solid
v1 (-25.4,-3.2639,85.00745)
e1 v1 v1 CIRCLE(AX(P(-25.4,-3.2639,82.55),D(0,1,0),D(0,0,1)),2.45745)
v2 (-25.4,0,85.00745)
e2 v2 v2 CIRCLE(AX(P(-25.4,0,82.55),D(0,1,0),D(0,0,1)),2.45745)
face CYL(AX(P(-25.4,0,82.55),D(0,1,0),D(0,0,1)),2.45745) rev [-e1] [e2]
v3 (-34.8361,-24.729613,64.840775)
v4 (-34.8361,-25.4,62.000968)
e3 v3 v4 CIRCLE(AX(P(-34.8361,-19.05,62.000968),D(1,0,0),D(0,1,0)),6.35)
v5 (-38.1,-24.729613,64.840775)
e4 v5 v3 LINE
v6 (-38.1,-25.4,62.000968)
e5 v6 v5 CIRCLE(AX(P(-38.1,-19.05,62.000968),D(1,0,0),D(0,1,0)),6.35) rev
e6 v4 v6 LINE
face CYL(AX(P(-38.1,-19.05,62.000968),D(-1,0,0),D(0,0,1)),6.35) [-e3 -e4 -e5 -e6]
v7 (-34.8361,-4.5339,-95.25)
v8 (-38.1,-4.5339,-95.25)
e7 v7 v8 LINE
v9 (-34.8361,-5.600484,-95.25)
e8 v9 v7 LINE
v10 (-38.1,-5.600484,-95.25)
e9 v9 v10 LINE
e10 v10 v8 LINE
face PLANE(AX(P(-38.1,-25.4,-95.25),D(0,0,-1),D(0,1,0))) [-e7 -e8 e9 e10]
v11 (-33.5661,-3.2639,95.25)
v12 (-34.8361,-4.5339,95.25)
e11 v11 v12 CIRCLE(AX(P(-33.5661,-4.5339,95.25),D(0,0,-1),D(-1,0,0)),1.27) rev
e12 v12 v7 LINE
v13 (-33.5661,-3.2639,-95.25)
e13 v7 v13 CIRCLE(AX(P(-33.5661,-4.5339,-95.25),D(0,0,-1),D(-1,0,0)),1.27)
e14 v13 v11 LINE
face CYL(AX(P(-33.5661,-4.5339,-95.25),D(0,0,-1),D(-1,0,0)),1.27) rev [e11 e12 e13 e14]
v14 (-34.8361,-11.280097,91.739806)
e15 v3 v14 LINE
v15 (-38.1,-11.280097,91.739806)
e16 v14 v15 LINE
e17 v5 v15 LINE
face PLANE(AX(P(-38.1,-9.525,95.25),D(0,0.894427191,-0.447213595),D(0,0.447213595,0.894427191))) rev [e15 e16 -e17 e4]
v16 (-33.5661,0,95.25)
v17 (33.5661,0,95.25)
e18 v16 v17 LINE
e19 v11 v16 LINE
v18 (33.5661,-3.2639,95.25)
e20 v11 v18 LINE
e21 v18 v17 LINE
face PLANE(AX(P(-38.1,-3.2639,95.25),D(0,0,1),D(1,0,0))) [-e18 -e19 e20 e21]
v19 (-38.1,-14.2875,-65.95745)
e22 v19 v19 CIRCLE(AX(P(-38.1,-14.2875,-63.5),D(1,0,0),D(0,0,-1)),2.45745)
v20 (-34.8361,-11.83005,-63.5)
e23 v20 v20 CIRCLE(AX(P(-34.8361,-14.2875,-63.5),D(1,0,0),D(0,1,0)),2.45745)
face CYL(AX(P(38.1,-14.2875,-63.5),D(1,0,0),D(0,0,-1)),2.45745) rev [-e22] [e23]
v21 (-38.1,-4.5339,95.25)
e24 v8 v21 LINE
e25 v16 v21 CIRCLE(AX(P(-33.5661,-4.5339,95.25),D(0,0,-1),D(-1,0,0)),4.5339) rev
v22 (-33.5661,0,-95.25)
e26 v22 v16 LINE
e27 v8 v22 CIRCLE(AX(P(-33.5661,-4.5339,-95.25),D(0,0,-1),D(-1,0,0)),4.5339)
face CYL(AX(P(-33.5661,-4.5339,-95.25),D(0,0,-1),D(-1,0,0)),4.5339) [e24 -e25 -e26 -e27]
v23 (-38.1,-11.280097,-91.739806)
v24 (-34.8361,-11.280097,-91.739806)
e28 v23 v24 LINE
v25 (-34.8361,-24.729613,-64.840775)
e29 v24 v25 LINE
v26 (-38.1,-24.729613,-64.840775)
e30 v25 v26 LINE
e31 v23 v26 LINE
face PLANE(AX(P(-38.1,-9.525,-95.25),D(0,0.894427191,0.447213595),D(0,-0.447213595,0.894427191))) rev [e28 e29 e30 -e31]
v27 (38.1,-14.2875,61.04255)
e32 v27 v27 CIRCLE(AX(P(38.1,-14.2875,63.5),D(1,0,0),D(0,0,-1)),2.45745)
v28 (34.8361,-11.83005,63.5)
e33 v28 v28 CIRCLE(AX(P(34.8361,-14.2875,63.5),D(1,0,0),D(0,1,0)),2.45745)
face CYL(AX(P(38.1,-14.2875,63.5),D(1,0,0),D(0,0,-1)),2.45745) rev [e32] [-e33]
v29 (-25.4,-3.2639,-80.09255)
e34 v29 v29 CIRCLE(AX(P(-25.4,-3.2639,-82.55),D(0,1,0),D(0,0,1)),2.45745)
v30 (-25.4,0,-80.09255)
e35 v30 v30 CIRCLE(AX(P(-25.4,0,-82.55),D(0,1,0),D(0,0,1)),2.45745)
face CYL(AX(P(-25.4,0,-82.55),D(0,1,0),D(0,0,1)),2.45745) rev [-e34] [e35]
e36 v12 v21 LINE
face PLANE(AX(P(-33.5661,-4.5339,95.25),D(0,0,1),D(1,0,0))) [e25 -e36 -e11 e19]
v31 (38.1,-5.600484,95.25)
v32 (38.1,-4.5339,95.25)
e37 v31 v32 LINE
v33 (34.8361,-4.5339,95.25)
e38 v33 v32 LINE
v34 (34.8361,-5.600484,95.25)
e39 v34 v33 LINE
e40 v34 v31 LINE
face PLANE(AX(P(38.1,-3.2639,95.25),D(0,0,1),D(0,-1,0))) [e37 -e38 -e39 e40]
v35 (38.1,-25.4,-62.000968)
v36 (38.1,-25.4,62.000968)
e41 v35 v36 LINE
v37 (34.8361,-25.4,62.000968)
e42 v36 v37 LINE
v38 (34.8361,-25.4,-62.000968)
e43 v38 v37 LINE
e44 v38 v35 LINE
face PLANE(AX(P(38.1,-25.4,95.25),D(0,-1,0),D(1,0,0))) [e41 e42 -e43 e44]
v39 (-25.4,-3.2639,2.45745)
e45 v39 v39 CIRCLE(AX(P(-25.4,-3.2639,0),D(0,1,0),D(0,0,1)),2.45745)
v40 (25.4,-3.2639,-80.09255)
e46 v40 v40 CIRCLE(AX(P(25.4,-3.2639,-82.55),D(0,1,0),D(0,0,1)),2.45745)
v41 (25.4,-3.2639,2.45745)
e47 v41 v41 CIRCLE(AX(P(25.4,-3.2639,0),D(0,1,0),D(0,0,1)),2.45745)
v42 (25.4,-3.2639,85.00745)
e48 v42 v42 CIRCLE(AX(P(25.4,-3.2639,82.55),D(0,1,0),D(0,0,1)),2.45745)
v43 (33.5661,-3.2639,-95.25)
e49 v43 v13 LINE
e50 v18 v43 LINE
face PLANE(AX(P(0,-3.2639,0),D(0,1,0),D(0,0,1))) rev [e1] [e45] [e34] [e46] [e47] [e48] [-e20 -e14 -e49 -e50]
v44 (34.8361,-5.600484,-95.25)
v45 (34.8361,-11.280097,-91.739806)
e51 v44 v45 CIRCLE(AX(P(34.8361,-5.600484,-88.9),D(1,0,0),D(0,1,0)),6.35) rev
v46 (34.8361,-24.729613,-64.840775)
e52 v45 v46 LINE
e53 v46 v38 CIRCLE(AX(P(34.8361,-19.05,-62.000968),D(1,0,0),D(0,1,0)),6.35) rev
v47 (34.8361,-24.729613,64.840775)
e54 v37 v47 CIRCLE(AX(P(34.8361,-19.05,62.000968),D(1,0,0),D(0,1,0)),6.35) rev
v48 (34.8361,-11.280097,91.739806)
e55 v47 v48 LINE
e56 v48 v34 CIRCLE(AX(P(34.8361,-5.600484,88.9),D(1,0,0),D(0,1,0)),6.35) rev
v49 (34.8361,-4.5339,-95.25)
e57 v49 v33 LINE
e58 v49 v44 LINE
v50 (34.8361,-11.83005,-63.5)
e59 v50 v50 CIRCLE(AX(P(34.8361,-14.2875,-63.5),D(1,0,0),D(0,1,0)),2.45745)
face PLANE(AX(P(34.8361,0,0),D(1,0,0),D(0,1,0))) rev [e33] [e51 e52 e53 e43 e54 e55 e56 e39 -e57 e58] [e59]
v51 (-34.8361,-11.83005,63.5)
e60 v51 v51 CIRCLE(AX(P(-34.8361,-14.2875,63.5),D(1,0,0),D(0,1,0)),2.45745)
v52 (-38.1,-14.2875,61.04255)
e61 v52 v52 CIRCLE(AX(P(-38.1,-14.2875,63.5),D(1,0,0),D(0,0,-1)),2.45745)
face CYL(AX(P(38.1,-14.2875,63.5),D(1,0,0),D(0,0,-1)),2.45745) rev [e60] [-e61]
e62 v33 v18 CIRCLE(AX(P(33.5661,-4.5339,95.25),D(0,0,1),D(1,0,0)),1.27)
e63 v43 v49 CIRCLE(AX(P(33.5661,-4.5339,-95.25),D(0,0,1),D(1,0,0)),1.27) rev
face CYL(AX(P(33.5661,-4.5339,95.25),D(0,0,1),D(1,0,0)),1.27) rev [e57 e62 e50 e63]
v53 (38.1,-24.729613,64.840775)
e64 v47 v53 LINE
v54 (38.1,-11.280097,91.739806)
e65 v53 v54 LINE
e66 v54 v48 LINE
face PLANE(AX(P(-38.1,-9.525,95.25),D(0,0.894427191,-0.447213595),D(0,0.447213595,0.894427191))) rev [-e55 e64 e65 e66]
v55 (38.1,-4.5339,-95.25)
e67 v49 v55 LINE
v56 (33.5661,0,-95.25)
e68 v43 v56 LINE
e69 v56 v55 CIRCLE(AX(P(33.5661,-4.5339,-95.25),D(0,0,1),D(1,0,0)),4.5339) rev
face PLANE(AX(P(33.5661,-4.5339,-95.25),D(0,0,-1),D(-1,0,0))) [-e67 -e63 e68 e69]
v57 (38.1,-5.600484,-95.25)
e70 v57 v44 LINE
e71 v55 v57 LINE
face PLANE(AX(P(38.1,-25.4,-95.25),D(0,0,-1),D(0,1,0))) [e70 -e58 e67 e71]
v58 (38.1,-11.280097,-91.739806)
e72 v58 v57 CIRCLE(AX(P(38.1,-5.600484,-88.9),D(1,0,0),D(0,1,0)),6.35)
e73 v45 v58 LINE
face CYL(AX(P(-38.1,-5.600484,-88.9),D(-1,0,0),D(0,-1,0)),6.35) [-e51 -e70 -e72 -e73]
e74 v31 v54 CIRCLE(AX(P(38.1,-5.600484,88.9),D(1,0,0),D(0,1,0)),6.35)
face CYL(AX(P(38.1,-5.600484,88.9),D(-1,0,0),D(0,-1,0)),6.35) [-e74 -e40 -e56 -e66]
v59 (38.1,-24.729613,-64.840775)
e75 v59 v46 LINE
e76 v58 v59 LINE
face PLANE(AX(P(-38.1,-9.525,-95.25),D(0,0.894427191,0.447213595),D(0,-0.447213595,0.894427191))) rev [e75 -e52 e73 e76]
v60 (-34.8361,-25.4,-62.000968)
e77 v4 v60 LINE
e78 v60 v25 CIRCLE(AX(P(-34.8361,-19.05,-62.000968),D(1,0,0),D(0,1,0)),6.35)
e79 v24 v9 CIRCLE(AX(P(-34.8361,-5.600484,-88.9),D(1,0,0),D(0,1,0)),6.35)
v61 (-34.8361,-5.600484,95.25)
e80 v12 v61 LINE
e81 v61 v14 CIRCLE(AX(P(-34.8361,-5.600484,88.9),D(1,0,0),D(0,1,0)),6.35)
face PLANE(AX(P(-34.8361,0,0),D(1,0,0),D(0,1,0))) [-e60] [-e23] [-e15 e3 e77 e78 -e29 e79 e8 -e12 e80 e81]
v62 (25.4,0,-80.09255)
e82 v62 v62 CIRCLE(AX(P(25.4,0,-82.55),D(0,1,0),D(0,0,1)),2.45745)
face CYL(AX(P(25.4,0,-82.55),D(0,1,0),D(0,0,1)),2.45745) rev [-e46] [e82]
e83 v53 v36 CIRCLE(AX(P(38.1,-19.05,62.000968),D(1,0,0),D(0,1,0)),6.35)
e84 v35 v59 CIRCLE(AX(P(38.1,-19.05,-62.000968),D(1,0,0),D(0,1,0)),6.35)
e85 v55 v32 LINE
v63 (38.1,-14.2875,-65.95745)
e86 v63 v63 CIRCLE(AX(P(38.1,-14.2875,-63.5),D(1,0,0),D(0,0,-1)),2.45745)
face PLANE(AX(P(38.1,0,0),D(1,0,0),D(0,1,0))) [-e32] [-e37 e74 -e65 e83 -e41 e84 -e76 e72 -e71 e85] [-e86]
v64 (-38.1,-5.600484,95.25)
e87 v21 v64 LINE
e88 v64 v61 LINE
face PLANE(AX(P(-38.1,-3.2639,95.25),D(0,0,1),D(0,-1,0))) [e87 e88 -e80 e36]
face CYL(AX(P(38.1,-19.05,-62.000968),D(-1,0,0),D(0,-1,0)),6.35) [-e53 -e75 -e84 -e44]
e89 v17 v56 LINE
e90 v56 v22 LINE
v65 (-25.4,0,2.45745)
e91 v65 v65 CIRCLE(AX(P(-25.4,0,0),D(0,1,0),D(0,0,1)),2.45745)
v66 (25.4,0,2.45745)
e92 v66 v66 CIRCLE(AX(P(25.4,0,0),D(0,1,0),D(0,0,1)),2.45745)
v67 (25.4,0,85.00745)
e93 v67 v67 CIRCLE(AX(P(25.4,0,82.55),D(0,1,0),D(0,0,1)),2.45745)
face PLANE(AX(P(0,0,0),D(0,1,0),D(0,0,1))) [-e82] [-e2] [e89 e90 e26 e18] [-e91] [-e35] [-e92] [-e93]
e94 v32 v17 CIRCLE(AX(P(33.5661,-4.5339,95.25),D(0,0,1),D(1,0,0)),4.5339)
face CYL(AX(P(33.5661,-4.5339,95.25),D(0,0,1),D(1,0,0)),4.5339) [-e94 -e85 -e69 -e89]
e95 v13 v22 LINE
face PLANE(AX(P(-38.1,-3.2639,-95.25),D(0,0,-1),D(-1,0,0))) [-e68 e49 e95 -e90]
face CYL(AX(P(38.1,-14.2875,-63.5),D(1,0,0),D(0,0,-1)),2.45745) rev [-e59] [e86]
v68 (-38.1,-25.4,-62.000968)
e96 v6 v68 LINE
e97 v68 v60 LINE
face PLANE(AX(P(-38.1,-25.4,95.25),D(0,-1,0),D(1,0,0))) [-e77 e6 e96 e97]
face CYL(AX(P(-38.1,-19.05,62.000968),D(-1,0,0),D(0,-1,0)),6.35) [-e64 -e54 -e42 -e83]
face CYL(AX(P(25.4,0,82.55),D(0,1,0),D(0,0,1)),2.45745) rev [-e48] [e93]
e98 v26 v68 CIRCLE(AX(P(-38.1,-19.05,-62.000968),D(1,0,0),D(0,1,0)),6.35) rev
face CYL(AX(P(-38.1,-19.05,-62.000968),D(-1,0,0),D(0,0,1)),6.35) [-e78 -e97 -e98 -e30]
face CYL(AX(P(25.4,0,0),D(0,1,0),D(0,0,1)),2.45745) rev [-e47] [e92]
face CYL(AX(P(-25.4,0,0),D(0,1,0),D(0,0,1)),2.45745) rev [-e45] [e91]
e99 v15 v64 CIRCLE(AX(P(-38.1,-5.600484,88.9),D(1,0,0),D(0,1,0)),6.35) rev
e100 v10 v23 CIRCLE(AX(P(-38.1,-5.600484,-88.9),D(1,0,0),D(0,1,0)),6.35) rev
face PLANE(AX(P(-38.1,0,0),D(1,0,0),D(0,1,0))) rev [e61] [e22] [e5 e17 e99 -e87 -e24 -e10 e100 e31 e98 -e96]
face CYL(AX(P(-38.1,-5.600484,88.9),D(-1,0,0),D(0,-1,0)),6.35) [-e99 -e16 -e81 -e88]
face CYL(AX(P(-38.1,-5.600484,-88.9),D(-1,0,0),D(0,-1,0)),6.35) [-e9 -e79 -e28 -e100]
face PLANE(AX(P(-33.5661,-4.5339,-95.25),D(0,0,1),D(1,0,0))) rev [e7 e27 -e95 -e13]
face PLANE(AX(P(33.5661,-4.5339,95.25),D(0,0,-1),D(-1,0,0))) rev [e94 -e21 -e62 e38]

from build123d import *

# Parameters (mm, degrees)
SKETCH1_W                      = 76.2
SKETCH1_H                      = 190.5
BASE_FLANGE1_DEPTH             = 3.2639
EDGE_FLANGE1_STRIP_W           = 15.5956
EDGE_FLANGE1_STRIP_H           = 3.2639
EDGE_FLANGE1_STRIP_CUT_DEPTH   = 190.5
EDGE_FLANGE1_STRIP_2_W         = 15.5956
EDGE_FLANGE1_STRIP_2_H         = 3.2639
EDGE_FLANGE1_STRIP_CUT_2_DEPTH = 190.5
EDGE_FLANGE1_DEPTH             = 190.5
EDGE_FLANGE1_BEND_DEPTH        = 190.5
F_10_0_1935_DIAMETER_HOLE1_D   = 4.9149
F_10_0_1935_DIAMETER_HOLE2_D   = 4.9149
CUT_EXTRUDE1_DEPTH             = 125.595997127
FILLET2_R                      = 6.35


# Sheet-metal steps are written as plain solids
with BuildPart() as part:
    # Sketch1 → Base-Flange1 (new body)
    with BuildSketch(Plane(origin=(0, 0, 0), x_dir=(1, 0, 0), z_dir=(0, 1, 0))):
        Rectangle(SKETCH1_W, SKETCH1_H)
    extrude(amount=-BASE_FLANGE1_DEPTH)

    # Edge-Flange1 strip (across the edge) → Edge-Flange1 strip cut (cut)
    with BuildSketch(Plane(origin=(38.1, -3.2639, -95.25), x_dir=(-1, 0, 0), z_dir=(0, 0, 1))):
        with Locations((-3.2639, -1.63195)):
            Rectangle(EDGE_FLANGE1_STRIP_W, EDGE_FLANGE1_STRIP_H)
    extrude(amount=EDGE_FLANGE1_STRIP_CUT_DEPTH, mode=Mode.SUBTRACT)

    # Edge-Flange1 strip 2 (across the edge) → Edge-Flange1 strip cut 2 (cut)
    with BuildSketch(Plane(origin=(-38.1, -3.2639, 95.25), x_dir=(1, 0, 0), z_dir=(0, 0, -1))):
        with Locations((-3.2639, -1.63195)):
            Rectangle(EDGE_FLANGE1_STRIP_2_W, EDGE_FLANGE1_STRIP_2_H)
    extrude(amount=EDGE_FLANGE1_STRIP_CUT_2_DEPTH, mode=Mode.SUBTRACT)

    # Edge-Flange1 section (across the edge) → Edge-Flange1 (add)
    with BuildSketch(Plane(origin=(38.1, -3.2639, -95.25), x_dir=(-1, 0, 0), z_dir=(0, 0, 1))):
        with BuildLine():
            Line((0, 1.27), (0, 22.1361))
            Line((0, 22.1361), (3.2639, 22.1361))
            Line((3.2639, 22.1361), (3.2639, 1.27))
            ThreePointArc((3.2639, 1.27), (3.635874388, 0.371974388), (4.5339, 0))
            Line((4.5339, 0), (4.5339, -3.2639))
            ThreePointArc((4.5339, -3.2639), (1.327948565, -1.935951435), (0, 1.27))
        make_face()
    extrude(amount=EDGE_FLANGE1_DEPTH)

    # Edge-Flange1 section 2 (across the edge) → Edge-Flange1 bend (add)
    with BuildSketch(Plane(origin=(-38.1, -3.2639, 95.25), x_dir=(1, 0, 0), z_dir=(0, 0, -1))):
        with BuildLine():
            Line((0, 1.27), (0, 22.1361))
            Line((0, 22.1361), (3.2639, 22.1361))
            Line((3.2639, 22.1361), (3.2639, 1.27))
            ThreePointArc((3.2639, 1.27), (3.635874388, 0.371974388), (4.5339, 0))
            Line((4.5339, 0), (4.5339, -3.2639))
            ThreePointArc((4.5339, -3.2639), (1.327948565, -1.935951435), (0, 1.27))
        make_face()
    extrude(amount=EDGE_FLANGE1_BEND_DEPTH)

    # #10 (0.1935) Diameter Hole1 (through all)
    with Locations(Plane(origin=(0, 0, 0), x_dir=(1, 0, 0), z_dir=(0, 1, 0))):
        with Locations((-25.4, 82.55), (25.4, 82.55), (-25.4, 0), (25.4, 0), (25.4, -82.55), (-25.4, -82.55)):
            Hole(F_10_0_1935_DIAMETER_HOLE1_D / 2)

    # #10 (0.1935) Diameter Hole2 (through all)
    with Locations(Plane(origin=(38.1, 0, 0), x_dir=(0, 0, -1), z_dir=(1, 0, 0))):
        with Locations((-63.5, -14.2875), (63.5, -14.2875)):
            Hole(F_10_0_1935_DIAMETER_HOLE2_D / 2)

    # Sketch19 → Cut-Extrude1 (cut, through all)
    with BuildSketch(Plane(origin=(38.1, 0, 0), x_dir=(0, 0, -1), z_dir=(1, 0, 0))):
        Polygon((-95.25, -9.525), (-63.5, -25.4), (-95.25, -25.4), align=None)
        Polygon((63.5, -25.4), (95.25, -25.4), (95.25, -9.525), align=None)
    extrude(amount=-CUT_EXTRUDE1_DEPTH, mode=Mode.SUBTRACT)

    # Fillet2
    fillet2_edges = [part.edges().sort_by_distance(p)[0] for p in [
        (36.46805, -25.4, 63.5),
        (36.46805, -9.525, 95.25),
        (-36.46805, -9.525, 95.25),
        (-36.46805, -25.4, 63.5),
        (36.46805, -25.4, -63.5),
        (36.46805, -9.525, -95.25),
        (-36.46805, -25.4, -63.5),
        (-36.46805, -9.525, -95.25),
    ]]
    fillet(fillet2_edges, radius=FILLET2_R)


solid = part.part
